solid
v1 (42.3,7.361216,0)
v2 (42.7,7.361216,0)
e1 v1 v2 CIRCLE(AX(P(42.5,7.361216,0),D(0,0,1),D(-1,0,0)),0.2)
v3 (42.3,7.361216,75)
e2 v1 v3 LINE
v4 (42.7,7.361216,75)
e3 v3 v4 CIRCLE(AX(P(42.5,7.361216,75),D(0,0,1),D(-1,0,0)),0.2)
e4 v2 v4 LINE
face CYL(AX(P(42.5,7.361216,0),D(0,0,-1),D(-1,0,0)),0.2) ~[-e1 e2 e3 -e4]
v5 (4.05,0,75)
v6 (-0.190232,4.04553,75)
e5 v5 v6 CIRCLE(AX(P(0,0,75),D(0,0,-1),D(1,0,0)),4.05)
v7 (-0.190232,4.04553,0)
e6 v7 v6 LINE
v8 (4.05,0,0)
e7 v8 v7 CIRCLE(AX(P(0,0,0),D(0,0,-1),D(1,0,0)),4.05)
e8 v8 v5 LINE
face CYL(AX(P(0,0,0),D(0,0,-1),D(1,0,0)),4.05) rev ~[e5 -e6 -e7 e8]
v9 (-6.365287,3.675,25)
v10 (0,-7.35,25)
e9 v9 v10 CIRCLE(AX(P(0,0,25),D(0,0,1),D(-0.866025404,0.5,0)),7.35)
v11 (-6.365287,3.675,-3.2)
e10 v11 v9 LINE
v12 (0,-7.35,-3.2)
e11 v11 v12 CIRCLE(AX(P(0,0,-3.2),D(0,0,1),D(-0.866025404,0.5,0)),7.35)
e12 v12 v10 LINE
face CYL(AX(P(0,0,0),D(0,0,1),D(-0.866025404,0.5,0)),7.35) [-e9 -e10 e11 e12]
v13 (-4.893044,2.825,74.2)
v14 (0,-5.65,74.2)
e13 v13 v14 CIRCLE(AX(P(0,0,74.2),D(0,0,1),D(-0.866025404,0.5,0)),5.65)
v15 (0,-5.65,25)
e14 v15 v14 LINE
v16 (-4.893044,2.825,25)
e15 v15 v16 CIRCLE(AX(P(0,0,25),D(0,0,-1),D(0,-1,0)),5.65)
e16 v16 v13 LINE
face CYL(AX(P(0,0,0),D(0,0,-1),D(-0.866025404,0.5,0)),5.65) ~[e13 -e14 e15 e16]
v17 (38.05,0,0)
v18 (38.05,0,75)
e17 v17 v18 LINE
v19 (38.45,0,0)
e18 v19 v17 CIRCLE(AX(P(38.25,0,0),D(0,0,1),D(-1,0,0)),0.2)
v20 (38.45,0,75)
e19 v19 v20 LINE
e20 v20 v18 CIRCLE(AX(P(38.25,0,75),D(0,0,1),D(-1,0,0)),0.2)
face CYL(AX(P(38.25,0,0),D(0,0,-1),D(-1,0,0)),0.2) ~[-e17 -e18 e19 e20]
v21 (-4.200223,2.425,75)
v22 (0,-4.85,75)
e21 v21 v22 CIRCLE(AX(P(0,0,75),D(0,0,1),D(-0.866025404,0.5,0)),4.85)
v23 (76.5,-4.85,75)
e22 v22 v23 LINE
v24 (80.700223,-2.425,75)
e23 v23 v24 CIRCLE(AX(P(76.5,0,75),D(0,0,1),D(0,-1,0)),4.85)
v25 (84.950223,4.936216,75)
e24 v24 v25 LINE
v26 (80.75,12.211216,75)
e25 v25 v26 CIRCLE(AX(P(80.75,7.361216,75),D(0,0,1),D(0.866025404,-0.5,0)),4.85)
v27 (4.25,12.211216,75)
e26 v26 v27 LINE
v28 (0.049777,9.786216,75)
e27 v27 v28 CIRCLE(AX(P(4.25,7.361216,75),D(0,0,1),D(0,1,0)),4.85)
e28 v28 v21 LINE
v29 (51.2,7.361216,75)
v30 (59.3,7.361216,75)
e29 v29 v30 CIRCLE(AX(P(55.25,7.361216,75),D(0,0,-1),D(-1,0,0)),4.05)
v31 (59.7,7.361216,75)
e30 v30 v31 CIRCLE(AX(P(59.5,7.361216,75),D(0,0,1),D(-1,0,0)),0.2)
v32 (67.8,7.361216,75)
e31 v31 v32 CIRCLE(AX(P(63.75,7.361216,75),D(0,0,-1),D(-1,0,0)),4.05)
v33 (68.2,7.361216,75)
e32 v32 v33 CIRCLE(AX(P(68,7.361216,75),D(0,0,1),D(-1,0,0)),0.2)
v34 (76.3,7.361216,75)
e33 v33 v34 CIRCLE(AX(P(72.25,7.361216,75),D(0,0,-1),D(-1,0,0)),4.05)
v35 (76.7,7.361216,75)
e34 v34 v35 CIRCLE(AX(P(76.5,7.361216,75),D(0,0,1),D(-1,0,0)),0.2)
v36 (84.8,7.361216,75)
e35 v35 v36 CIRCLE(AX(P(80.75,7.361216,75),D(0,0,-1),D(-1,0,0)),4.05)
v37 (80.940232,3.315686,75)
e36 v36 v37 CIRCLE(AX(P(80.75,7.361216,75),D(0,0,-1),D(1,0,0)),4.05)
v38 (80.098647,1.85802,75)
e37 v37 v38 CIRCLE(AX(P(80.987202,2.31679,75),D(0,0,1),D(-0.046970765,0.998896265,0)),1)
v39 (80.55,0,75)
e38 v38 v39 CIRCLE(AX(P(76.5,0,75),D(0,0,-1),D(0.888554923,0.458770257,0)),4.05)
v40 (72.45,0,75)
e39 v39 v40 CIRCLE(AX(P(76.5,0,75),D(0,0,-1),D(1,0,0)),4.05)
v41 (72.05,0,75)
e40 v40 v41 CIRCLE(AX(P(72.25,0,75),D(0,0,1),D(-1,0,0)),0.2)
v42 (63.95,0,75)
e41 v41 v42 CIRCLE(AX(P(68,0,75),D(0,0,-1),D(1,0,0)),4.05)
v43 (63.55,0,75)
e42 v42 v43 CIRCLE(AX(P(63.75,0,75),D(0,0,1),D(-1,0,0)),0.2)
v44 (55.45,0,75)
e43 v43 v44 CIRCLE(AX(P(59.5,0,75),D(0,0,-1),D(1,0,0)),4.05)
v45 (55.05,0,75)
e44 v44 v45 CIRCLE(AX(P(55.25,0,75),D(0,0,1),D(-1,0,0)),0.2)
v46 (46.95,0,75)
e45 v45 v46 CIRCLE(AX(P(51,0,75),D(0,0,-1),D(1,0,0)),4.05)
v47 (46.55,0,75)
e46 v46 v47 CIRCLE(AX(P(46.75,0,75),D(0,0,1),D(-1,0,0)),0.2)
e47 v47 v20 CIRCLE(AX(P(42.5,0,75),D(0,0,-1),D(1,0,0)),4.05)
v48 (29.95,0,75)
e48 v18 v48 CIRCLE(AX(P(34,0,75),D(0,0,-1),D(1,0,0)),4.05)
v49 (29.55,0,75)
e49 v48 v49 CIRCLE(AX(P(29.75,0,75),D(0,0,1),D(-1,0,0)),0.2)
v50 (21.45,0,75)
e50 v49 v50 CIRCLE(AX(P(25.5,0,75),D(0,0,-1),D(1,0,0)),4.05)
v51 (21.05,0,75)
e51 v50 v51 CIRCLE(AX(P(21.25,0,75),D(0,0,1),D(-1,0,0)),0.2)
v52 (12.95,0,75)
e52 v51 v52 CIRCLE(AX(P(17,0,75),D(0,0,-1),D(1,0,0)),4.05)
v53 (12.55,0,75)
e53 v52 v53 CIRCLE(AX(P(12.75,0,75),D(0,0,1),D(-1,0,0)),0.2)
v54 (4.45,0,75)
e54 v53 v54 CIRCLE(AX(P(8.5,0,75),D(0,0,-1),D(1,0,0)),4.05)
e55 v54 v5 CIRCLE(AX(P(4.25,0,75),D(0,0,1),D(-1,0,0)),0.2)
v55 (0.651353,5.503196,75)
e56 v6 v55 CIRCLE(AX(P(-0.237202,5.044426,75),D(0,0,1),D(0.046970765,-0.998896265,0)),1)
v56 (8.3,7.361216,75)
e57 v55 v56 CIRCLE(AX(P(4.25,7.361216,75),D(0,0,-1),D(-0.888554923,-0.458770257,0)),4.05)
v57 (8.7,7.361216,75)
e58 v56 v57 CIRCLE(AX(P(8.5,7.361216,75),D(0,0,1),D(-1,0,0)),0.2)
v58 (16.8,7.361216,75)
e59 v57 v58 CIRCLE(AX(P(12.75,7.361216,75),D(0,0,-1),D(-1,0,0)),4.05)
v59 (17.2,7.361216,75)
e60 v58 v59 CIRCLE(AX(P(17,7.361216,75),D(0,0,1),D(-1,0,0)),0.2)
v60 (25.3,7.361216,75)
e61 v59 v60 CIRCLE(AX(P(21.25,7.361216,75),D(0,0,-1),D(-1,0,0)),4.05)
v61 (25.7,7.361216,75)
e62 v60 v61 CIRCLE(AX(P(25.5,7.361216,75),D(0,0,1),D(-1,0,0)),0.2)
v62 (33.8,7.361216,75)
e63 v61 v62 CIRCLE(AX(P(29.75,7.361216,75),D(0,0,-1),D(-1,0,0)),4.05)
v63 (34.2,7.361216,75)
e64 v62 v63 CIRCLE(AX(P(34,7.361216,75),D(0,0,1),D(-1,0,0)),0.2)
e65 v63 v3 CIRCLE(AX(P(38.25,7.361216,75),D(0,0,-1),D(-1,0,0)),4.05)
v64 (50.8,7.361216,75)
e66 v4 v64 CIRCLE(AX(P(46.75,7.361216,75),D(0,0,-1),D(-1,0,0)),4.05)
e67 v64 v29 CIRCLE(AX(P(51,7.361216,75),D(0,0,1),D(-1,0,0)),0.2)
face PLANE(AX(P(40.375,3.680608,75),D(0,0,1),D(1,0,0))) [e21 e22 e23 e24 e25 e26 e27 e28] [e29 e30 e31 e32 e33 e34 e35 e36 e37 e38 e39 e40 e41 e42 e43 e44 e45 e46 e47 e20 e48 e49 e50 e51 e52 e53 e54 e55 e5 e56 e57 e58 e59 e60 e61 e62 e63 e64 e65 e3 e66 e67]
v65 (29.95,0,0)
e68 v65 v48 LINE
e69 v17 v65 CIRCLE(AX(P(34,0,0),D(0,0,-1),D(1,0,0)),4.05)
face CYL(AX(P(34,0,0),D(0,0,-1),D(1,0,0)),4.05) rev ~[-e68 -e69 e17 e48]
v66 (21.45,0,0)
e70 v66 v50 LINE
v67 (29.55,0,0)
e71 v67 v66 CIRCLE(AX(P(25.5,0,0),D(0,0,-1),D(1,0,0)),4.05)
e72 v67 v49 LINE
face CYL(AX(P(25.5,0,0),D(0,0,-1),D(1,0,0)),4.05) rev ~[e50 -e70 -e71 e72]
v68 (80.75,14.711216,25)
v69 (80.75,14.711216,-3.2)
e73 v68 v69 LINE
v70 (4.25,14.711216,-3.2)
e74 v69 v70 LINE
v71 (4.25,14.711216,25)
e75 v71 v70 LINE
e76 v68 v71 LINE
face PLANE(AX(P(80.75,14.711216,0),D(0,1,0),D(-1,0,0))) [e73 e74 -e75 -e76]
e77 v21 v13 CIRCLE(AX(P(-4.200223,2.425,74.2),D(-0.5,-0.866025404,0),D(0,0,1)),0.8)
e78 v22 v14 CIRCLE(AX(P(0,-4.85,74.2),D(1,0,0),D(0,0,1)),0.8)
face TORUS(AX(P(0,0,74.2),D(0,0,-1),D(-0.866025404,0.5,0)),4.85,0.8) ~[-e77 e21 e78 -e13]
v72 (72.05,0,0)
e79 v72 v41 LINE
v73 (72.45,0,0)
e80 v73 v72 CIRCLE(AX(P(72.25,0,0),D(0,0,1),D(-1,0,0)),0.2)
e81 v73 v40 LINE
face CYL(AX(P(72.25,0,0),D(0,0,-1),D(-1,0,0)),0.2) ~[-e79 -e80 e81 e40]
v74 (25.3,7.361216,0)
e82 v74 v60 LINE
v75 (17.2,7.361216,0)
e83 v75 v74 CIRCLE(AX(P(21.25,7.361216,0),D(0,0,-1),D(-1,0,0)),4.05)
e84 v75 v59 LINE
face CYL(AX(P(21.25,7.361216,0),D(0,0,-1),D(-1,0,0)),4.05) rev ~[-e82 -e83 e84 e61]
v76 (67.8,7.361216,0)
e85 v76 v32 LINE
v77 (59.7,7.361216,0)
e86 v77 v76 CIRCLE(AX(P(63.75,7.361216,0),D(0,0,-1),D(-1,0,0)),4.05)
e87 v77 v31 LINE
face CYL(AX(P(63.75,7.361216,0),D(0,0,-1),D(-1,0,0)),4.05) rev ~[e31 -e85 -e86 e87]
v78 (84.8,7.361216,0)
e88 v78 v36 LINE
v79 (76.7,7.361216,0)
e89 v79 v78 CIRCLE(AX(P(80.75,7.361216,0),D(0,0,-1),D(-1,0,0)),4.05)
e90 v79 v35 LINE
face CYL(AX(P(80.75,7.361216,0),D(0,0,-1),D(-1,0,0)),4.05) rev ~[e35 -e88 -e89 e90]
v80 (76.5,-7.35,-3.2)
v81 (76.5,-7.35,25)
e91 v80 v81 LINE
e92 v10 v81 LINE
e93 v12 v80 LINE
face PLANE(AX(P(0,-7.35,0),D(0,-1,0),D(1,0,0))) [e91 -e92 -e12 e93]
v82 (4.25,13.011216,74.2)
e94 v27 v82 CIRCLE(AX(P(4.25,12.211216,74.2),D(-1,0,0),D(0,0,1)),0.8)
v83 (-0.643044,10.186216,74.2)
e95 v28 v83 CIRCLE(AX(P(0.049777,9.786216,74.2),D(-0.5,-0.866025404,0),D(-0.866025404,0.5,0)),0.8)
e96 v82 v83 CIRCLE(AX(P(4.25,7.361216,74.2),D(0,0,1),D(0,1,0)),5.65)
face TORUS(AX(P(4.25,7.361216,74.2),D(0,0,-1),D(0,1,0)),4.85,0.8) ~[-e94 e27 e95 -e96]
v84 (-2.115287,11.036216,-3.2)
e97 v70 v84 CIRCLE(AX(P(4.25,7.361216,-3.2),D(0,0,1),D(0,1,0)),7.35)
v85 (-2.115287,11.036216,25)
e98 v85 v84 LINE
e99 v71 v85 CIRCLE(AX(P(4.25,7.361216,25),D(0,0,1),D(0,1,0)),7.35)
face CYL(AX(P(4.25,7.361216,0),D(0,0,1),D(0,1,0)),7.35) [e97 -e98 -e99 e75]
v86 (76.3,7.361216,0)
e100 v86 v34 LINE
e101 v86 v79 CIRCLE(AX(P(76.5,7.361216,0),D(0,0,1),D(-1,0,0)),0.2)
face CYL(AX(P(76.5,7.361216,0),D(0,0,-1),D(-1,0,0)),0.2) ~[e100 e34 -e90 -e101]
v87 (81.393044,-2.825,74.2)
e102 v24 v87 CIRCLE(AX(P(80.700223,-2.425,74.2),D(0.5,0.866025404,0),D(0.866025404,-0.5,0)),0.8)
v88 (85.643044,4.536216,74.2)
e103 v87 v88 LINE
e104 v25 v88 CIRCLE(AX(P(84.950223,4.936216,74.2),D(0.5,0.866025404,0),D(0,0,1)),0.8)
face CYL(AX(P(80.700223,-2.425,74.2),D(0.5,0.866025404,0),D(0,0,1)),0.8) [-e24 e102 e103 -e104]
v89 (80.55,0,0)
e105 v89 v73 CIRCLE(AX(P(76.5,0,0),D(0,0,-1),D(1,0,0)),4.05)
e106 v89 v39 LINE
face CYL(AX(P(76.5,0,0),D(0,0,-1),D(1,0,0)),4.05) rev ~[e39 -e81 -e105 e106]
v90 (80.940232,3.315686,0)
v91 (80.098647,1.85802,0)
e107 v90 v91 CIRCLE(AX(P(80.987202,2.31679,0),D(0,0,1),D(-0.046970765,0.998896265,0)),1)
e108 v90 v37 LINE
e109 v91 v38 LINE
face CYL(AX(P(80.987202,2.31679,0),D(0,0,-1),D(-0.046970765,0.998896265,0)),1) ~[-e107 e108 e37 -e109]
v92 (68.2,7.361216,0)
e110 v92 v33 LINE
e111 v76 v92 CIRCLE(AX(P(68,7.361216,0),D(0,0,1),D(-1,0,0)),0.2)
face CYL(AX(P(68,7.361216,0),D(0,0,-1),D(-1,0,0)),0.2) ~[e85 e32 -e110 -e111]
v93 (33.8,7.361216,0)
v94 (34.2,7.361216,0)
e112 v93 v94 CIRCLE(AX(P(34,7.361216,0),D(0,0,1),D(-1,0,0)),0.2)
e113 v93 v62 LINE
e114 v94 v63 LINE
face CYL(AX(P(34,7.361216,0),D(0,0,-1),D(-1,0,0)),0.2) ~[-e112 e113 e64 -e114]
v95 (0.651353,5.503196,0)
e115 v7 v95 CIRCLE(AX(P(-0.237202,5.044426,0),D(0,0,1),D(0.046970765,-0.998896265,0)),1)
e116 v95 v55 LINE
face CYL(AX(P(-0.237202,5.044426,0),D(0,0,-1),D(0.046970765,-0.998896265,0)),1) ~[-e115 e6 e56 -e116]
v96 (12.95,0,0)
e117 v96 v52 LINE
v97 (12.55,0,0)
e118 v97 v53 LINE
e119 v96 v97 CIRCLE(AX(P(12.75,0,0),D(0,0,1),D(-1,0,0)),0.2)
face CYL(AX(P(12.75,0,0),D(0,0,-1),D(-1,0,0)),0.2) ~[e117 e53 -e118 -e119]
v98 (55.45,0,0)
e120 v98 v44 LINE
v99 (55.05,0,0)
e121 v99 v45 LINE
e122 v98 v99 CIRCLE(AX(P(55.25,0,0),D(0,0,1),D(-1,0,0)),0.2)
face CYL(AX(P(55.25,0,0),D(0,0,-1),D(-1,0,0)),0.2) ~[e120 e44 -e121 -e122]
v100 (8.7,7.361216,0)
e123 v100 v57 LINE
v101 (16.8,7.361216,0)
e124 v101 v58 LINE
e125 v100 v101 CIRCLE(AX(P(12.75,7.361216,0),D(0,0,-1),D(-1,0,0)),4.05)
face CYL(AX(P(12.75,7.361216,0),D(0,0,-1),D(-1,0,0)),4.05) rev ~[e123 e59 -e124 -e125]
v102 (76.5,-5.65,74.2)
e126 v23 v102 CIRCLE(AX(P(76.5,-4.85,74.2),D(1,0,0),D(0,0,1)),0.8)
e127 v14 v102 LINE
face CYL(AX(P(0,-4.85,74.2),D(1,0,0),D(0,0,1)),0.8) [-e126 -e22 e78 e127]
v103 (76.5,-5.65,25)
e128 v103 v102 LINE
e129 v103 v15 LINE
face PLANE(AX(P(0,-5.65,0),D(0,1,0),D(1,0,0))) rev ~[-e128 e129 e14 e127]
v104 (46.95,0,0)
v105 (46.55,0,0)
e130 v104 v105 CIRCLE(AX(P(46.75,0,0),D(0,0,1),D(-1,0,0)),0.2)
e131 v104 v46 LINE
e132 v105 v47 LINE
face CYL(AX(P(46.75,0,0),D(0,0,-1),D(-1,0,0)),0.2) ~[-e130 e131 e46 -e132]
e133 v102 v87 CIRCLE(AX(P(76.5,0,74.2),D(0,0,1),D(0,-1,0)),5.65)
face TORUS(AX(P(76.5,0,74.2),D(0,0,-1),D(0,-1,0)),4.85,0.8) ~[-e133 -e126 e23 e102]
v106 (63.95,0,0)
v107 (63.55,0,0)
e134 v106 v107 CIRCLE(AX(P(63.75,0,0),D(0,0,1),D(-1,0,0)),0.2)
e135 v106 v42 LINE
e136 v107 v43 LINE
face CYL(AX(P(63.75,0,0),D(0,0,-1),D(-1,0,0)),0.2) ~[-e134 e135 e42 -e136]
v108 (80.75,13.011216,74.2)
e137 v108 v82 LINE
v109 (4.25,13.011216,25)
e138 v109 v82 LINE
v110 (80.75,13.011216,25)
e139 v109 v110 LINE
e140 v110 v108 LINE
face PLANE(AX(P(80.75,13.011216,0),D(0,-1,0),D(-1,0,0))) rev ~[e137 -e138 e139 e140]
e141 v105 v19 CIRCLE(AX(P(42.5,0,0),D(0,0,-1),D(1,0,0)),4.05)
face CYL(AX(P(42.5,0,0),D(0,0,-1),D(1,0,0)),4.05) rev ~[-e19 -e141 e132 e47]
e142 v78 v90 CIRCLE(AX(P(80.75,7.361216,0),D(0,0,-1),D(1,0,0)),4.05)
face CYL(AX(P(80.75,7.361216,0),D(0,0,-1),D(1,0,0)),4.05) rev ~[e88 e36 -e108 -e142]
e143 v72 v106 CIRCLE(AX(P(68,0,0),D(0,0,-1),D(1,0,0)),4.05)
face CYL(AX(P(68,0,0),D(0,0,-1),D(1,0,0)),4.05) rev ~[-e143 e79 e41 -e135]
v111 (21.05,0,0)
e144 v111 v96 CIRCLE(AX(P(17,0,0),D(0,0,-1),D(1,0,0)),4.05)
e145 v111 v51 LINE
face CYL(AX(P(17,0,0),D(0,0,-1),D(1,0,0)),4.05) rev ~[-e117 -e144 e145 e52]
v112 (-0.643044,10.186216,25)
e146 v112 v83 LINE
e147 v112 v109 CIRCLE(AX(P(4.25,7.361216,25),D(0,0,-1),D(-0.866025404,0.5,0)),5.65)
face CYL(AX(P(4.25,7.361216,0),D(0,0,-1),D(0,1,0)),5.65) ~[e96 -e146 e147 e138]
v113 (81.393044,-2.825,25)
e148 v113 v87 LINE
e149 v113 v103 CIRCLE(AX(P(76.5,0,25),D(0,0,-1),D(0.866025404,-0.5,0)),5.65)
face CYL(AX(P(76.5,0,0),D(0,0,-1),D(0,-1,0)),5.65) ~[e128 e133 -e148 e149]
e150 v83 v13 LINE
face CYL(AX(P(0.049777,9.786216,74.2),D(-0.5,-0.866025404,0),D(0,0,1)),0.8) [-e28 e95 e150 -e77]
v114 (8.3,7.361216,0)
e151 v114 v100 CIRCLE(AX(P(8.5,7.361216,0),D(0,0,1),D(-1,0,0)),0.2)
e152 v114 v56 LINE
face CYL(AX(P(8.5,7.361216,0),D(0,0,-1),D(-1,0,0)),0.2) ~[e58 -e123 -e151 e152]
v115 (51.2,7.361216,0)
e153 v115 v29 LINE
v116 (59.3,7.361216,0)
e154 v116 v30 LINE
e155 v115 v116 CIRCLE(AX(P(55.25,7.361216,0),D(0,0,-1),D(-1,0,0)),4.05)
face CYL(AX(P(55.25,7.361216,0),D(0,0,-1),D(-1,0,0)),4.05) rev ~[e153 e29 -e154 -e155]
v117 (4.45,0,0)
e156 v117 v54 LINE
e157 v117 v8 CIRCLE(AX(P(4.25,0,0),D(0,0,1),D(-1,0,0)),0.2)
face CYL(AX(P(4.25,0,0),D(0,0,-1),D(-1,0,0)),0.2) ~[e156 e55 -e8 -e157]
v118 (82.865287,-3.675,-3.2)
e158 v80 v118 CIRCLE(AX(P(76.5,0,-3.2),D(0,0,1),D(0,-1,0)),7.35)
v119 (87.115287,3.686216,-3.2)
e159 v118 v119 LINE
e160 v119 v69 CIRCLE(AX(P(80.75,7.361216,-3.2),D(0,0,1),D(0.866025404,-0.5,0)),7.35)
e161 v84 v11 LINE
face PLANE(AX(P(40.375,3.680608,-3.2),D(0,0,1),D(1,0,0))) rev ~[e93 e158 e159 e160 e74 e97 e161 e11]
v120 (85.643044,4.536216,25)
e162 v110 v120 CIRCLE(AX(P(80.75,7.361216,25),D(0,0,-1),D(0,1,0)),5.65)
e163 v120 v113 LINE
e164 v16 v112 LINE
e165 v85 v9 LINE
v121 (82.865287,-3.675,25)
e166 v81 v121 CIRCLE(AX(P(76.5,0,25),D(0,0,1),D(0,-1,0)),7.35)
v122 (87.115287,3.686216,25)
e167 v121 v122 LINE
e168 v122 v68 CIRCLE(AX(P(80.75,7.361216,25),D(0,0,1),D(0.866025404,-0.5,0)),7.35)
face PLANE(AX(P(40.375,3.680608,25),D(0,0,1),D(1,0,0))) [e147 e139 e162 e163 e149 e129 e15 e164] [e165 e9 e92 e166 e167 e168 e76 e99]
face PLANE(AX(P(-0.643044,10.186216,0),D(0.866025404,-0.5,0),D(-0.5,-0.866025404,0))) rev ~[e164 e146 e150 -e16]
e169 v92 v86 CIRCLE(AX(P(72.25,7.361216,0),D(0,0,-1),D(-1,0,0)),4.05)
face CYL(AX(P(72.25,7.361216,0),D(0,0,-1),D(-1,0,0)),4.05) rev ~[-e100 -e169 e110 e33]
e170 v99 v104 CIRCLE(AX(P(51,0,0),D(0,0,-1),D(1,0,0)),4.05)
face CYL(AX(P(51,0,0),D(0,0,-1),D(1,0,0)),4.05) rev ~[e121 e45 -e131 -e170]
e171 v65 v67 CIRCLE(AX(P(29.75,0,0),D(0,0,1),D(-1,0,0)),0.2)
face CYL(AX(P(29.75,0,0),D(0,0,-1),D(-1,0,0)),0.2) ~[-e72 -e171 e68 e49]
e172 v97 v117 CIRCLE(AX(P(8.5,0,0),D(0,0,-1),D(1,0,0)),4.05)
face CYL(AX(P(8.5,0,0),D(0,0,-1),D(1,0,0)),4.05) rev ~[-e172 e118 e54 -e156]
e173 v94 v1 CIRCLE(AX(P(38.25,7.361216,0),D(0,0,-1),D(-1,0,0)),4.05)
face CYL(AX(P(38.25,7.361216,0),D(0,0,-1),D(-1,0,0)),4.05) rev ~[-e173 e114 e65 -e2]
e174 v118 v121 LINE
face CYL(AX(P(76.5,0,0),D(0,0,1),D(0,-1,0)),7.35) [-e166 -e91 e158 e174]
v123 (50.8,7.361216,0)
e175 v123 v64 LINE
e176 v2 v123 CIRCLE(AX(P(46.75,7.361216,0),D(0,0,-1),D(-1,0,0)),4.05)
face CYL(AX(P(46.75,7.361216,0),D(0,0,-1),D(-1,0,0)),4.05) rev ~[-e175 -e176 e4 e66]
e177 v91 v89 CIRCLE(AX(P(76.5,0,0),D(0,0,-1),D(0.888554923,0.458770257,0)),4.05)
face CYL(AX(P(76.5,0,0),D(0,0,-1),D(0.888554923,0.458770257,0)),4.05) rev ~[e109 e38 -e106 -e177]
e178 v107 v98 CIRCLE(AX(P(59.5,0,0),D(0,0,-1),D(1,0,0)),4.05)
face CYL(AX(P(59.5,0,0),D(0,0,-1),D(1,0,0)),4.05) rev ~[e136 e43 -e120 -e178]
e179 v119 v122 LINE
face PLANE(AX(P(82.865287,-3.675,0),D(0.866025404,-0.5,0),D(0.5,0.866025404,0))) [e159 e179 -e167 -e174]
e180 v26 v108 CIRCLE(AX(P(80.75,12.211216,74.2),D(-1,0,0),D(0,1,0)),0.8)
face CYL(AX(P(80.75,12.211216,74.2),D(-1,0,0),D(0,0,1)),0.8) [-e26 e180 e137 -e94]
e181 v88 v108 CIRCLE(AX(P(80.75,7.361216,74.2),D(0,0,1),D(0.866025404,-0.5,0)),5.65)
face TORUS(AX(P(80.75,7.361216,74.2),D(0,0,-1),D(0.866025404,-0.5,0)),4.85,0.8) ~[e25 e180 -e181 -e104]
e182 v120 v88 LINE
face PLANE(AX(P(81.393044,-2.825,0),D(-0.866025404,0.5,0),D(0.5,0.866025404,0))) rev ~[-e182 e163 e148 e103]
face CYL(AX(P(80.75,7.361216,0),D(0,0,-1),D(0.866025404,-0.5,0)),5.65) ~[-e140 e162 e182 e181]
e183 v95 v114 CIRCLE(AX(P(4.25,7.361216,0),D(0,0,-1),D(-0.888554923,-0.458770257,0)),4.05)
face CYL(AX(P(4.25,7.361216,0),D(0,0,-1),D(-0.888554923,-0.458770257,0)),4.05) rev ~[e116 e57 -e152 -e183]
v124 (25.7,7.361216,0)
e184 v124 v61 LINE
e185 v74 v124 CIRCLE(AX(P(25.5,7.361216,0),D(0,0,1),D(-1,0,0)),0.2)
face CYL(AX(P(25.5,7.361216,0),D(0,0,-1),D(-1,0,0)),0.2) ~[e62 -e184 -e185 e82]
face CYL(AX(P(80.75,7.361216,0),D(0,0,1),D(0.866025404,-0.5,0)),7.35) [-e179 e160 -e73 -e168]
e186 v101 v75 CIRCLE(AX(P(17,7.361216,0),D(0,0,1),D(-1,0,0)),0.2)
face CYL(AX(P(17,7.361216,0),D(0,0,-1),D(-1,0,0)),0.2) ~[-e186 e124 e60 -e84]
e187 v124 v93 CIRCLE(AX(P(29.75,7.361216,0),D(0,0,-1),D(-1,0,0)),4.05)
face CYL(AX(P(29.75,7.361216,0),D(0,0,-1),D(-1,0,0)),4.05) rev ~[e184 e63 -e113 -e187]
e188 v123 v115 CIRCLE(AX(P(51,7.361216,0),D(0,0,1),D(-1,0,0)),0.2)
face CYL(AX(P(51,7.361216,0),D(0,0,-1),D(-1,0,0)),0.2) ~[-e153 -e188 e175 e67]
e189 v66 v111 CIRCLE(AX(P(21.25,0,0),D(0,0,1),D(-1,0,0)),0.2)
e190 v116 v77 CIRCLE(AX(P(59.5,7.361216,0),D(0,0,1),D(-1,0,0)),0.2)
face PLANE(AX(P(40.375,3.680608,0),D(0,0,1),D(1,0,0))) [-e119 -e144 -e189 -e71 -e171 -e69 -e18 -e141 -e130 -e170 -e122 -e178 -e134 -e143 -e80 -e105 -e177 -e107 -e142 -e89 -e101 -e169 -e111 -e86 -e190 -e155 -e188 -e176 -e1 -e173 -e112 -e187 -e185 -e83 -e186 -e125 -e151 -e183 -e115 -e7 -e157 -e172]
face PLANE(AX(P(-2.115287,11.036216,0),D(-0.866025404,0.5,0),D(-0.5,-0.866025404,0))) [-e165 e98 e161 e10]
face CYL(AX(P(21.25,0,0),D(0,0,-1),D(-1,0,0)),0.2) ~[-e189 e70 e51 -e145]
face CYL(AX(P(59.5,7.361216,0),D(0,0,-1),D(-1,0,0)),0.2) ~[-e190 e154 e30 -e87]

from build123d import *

# Parameters (mm, degrees)
F1_DEPTH = 75
F2_DEPTH = 25
F3_DEPTH = 3.2
F4_R     = 0.8


# Not quite as in the source:
# - a feature names something its author has since deleted; it is built from what else it names


with BuildPart() as f1:
    # F0 (on Top) → F1 (new body)
    with BuildSketch(Plane.XY):
        with BuildLine():
            Line((-0.6430435314, 10.1862159322), (-4.8930435314, 2.825))
            ThreePointArc((-4.8930435314, 2.825), (-4.8930435314, -2.825), (0, -5.65))
            Line((0, -5.65), (76.5, -5.65))
            ThreePointArc((76.5, -5.65), (79.325, -4.8930435314), (81.3930435314, -2.825))
            Line((81.3930435314, -2.825), (85.6430435314, 4.5362159322))
            ThreePointArc((85.6430435314, 4.5362159322), (85.6430435314, 10.1862159322), (80.75, 13.0112159322))
            Line((80.75, 13.0112159322), (4.25, 13.0112159322))
            ThreePointArc((4.25, 13.0112159322), (1.425, 12.2542594635), (-0.6430435314, 10.1862159322))
        make_face()
        with BuildLine():
            ThreePointArc((4.45, 0), (4.25, -0.2), (4.05, 0))
            ThreePointArc((4.05, 0), (-2.7957165477, -2.9302677326), (-0.1902315974, 4.0455298713))
            ThreePointArc((-0.1902315974, 4.0455298713), (0.6288230416, 4.5444261358), (0.651352561, 5.5031963925))
            ThreePointArc((0.651352561, 5.5031963925), (3.2939723142, 11.2967605024), (8.3, 7.3612159322))
            ThreePointArc((8.3, 7.3612159322), (8.5, 7.5612159322), (8.7, 7.3612159322))
            ThreePointArc((8.7, 7.3612159322), (12.75, 11.4112159322), (16.8, 7.3612159322))
            ThreePointArc((16.8, 7.3612159322), (17, 7.5612159322), (17.2, 7.3612159322))
            ThreePointArc((17.2, 7.3612159322), (21.25, 11.4112159322), (25.3, 7.3612159322))
            ThreePointArc((25.3, 7.3612159322), (25.5, 7.5612159322), (25.7, 7.3612159322))
            ThreePointArc((25.7, 7.3612159322), (29.75, 11.4112159322), (33.8, 7.3612159322))
            ThreePointArc((33.8, 7.3612159322), (34, 7.5612159322), (34.2, 7.3612159322))
            ThreePointArc((34.2, 7.3612159322), (38.25, 11.4112159322), (42.3, 7.3612159322))
            ThreePointArc((42.3, 7.3612159322), (42.5, 7.5612159322), (42.7, 7.3612159322))
            ThreePointArc((42.7, 7.3612159322), (46.75, 11.4112159322), (50.8, 7.3612159322))
            ThreePointArc((50.8, 7.3612159322), (51, 7.5612159322), (51.2, 7.3612159322))
            ThreePointArc((51.2, 7.3612159322), (55.25, 11.4112159322), (59.3, 7.3612159322))
            ThreePointArc((59.3, 7.3612159322), (59.5, 7.5612159322), (59.7, 7.3612159322))
            ThreePointArc((59.7, 7.3612159322), (63.75, 11.4112159322), (67.8, 7.3612159322))
            ThreePointArc((67.8, 7.3612159322), (68, 7.5612159322), (68.2, 7.3612159322))
            ThreePointArc((68.2, 7.3612159322), (72.25, 11.4112159322), (76.3, 7.3612159322))
            ThreePointArc((76.3, 7.3612159322), (76.5, 7.5612159322), (76.7, 7.3612159322))
            ThreePointArc((76.7, 7.3612159322), (80.75, 11.4112159322), (84.8, 7.3612159322))
            ThreePointArc((84.8, 7.3612159322), (83.6802677326, 4.5654993844), (80.9402315974, 3.3156860609))
            ThreePointArc((80.9402315974, 3.3156860609), (80.1211769584, 2.8167897964), (80.098647439, 1.8580195397))
            ThreePointArc((80.098647439, 1.8580195397), (80.4355445702, 0.9560276858), (80.55, 0))
            ThreePointArc((80.55, 0), (76.5, -4.05), (72.45, 0))
            ThreePointArc((72.45, 0), (72.25, -0.2), (72.05, 0))
            ThreePointArc((72.05, 0), (68, -4.05), (63.95, 0))
            ThreePointArc((63.95, 0), (63.75, -0.2), (63.55, 0))
            ThreePointArc((63.55, 0), (59.5, -4.05), (55.45, 0))
            ThreePointArc((55.45, 0), (55.25, -0.2), (55.05, 0))
            ThreePointArc((55.05, 0), (51, -4.05), (46.95, 0))
            ThreePointArc((46.95, 0), (46.75, -0.2), (46.55, 0))
            ThreePointArc((46.55, 0), (42.5, -4.05), (38.45, 0))
            ThreePointArc((38.45, 0), (38.25, -0.2), (38.05, 0))
            ThreePointArc((38.05, 0), (34, -4.05), (29.95, 0))
            ThreePointArc((29.95, 0), (29.75, -0.2), (29.55, 0))
            ThreePointArc((29.55, 0), (25.5, -4.05), (21.45, 0))
            ThreePointArc((21.45, 0), (21.25, -0.2), (21.05, 0))
            ThreePointArc((21.05, 0), (17, -4.05), (12.95, 0))
            ThreePointArc((12.95, 0), (12.75, -0.2), (12.55, 0))
            ThreePointArc((12.55, 0), (8.5, -4.05), (4.45, 0))
        make_face(mode=Mode.SUBTRACT)
        with BuildLine():
            ThreePointArc((4.45, 0), (4.25, 0.2), (4.05, 0))
            ThreePointArc((4.05, 0), (4.25, -0.2), (4.45, 0))
        make_face()
        with BuildLine():
            ThreePointArc((8.7, 7.3612159322), (8.5, 7.5612159322), (8.3, 7.3612159322))
            ThreePointArc((8.3, 7.3612159322), (8.5, 7.1612159322), (8.7, 7.3612159322))
        make_face()
        with BuildLine():
            ThreePointArc((12.95, 0), (12.75, 0.2), (12.55, 0))
            ThreePointArc((12.55, 0), (12.75, -0.2), (12.95, 0))
        make_face()
        with BuildLine():
            ThreePointArc((17.2, 7.3612159322), (17, 7.5612159322), (16.8, 7.3612159322))
            ThreePointArc((16.8, 7.3612159322), (17, 7.1612159322), (17.2, 7.3612159322))
        make_face()
        with BuildLine():
            ThreePointArc((21.45, 0), (21.25, 0.2), (21.05, 0))
            ThreePointArc((21.05, 0), (21.25, -0.2), (21.45, 0))
        make_face()
        with BuildLine():
            ThreePointArc((25.7, 7.3612159322), (25.5, 7.5612159322), (25.3, 7.3612159322))
            ThreePointArc((25.3, 7.3612159322), (25.5, 7.1612159322), (25.7, 7.3612159322))
        make_face()
        with BuildLine():
            ThreePointArc((29.95, 0), (29.75, 0.2), (29.55, 0))
            ThreePointArc((29.55, 0), (29.75, -0.2), (29.95, 0))
        make_face()
        with BuildLine():
            ThreePointArc((34.2, 7.3612159322), (34, 7.5612159322), (33.8, 7.3612159322))
            ThreePointArc((33.8, 7.3612159322), (34, 7.1612159322), (34.2, 7.3612159322))
        make_face()
        with BuildLine():
            ThreePointArc((38.45, 0), (38.25, 0.2), (38.05, 0))
            ThreePointArc((38.05, 0), (38.25, -0.2), (38.45, 0))
        make_face()
        with BuildLine():
            ThreePointArc((42.7, 7.3612159322), (42.5, 7.5612159322), (42.3, 7.3612159322))
            ThreePointArc((42.3, 7.3612159322), (42.5, 7.1612159322), (42.7, 7.3612159322))
        make_face()
        with BuildLine():
            ThreePointArc((46.95, 0), (46.75, 0.2), (46.55, 0))
            ThreePointArc((46.55, 0), (46.75, -0.2), (46.95, 0))
        make_face()
        with BuildLine():
            ThreePointArc((51.2, 7.3612159322), (51, 7.5612159322), (50.8, 7.3612159322))
            ThreePointArc((50.8, 7.3612159322), (51, 7.1612159322), (51.2, 7.3612159322))
        make_face()
        with BuildLine():
            ThreePointArc((55.45, 0), (55.25, 0.2), (55.05, 0))
            ThreePointArc((55.05, 0), (55.25, -0.2), (55.45, 0))
        make_face()
        with BuildLine():
            ThreePointArc((59.7, 7.3612159322), (59.5, 7.5612159322), (59.3, 7.3612159322))
            ThreePointArc((59.3, 7.3612159322), (59.5, 7.1612159322), (59.7, 7.3612159322))
        make_face()
        with BuildLine():
            ThreePointArc((63.95, 0), (63.75, 0.2), (63.55, 0))
            ThreePointArc((63.55, 0), (63.75, -0.2), (63.95, 0))
        make_face()
        with BuildLine():
            ThreePointArc((68.2, 7.3612159322), (68, 7.5612159322), (67.8, 7.3612159322))
            ThreePointArc((67.8, 7.3612159322), (68, 7.1612159322), (68.2, 7.3612159322))
        make_face()
        with BuildLine():
            ThreePointArc((72.45, 0), (72.25, 0.2), (72.05, 0))
            ThreePointArc((72.05, 0), (72.25, -0.2), (72.45, 0))
        make_face()
        with BuildLine():
            ThreePointArc((76.7, 7.3612159322), (76.5, 7.5612159322), (76.3, 7.3612159322))
            ThreePointArc((76.3, 7.3612159322), (76.5, 7.1612159322), (76.7, 7.3612159322))
        make_face()
    extrude(amount=F1_DEPTH)

    # F0 (on Top) → F2 (join)
    with BuildSketch(Plane.XY):
        with BuildLine():
            Line((-2.1152867178, 11.0362159322), (-6.3652867178, 3.675))
            ThreePointArc((-6.3652867178, 3.675), (-6.3652867178, -3.675), (0, -7.35))
            Line((0, -7.35), (76.5, -7.35))
            ThreePointArc((76.5, -7.35), (80.175, -6.3652867178), (82.8652867178, -3.675))
            Line((82.8652867178, -3.675), (87.1152867178, 3.6862159322))
            ThreePointArc((87.1152867178, 3.6862159322), (87.1152867178, 11.0362159322), (80.75, 14.7112159322))
            Line((80.75, 14.7112159322), (4.25, 14.7112159322))
            ThreePointArc((4.25, 14.7112159322), (0.575, 13.72650265), (-2.1152867178, 11.0362159322))
        make_face()
        with BuildLine():
            ThreePointArc((0, -5.65), (-4.8930435314, -2.825), (-4.8930435314, 2.825))
            Line((-4.8930435314, 2.825), (-0.6430435314, 10.1862159322))
            ThreePointArc((-0.6430435314, 10.1862159322), (1.425, 12.2542594635), (4.25, 13.0112159322))
            Line((4.25, 13.0112159322), (80.75, 13.0112159322))
            ThreePointArc((80.75, 13.0112159322), (85.6430435314, 10.1862159322), (85.6430435314, 4.5362159322))
            Line((85.6430435314, 4.5362159322), (81.3930435314, -2.825))
            ThreePointArc((81.3930435314, -2.825), (79.325, -4.8930435314), (76.5, -5.65))
            Line((76.5, -5.65), (0, -5.65))
        make_face(mode=Mode.SUBTRACT)
    extrude(amount=F2_DEPTH)

    # F0 (on Top) → F3 (join)
    with BuildSketch(Plane.XY):
        with BuildLine():
            Line((-2.1152867178, 11.0362159322), (-6.3652867178, 3.675))
            ThreePointArc((-6.3652867178, 3.675), (-6.3652867178, -3.675), (0, -7.35))
            Line((0, -7.35), (76.5, -7.35))
            ThreePointArc((76.5, -7.35), (80.175, -6.3652867178), (82.8652867178, -3.675))
            Line((82.8652867178, -3.675), (87.1152867178, 3.6862159322))
            ThreePointArc((87.1152867178, 3.6862159322), (87.1152867178, 11.0362159322), (80.75, 14.7112159322))
            Line((80.75, 14.7112159322), (4.25, 14.7112159322))
            ThreePointArc((4.25, 14.7112159322), (0.575, 13.72650265), (-2.1152867178, 11.0362159322))
        make_face()
        with BuildLine():
            ThreePointArc((0, -5.65), (-4.8930435314, -2.825), (-4.8930435314, 2.825))
            Line((-4.8930435314, 2.825), (-0.6430435314, 10.1862159322))
            ThreePointArc((-0.6430435314, 10.1862159322), (1.425, 12.2542594635), (4.25, 13.0112159322))
            Line((4.25, 13.0112159322), (80.75, 13.0112159322))
            ThreePointArc((80.75, 13.0112159322), (85.6430435314, 10.1862159322), (85.6430435314, 4.5362159322))
            Line((85.6430435314, 4.5362159322), (81.3930435314, -2.825))
            ThreePointArc((81.3930435314, -2.825), (79.325, -4.8930435314), (76.5, -5.65))
            Line((76.5, -5.65), (0, -5.65))
        make_face(mode=Mode.SUBTRACT)
        with BuildLine():
            Line((-0.6430435314, 10.1862159322), (-4.8930435314, 2.825))
            ThreePointArc((-4.8930435314, 2.825), (-4.8930435314, -2.825), (0, -5.65))
            Line((0, -5.65), (76.5, -5.65))
            ThreePointArc((76.5, -5.65), (79.325, -4.8930435314), (81.3930435314, -2.825))
            Line((81.3930435314, -2.825), (85.6430435314, 4.5362159322))
            ThreePointArc((85.6430435314, 4.5362159322), (85.6430435314, 10.1862159322), (80.75, 13.0112159322))
            Line((80.75, 13.0112159322), (4.25, 13.0112159322))
            ThreePointArc((4.25, 13.0112159322), (1.425, 12.2542594635), (-0.6430435314, 10.1862159322))
        make_face()
        with BuildLine():
            ThreePointArc((4.45, 0), (4.25, -0.2), (4.05, 0))
            ThreePointArc((4.05, 0), (-2.7957165477, -2.9302677326), (-0.1902315974, 4.0455298713))
            ThreePointArc((-0.1902315974, 4.0455298713), (0.6288230416, 4.5444261358), (0.651352561, 5.5031963925))
            ThreePointArc((0.651352561, 5.5031963925), (3.2939723142, 11.2967605024), (8.3, 7.3612159322))
            ThreePointArc((8.3, 7.3612159322), (8.5, 7.5612159322), (8.7, 7.3612159322))
            ThreePointArc((8.7, 7.3612159322), (12.75, 11.4112159322), (16.8, 7.3612159322))
            ThreePointArc((16.8, 7.3612159322), (17, 7.5612159322), (17.2, 7.3612159322))
            ThreePointArc((17.2, 7.3612159322), (21.25, 11.4112159322), (25.3, 7.3612159322))
            ThreePointArc((25.3, 7.3612159322), (25.5, 7.5612159322), (25.7, 7.3612159322))
            ThreePointArc((25.7, 7.3612159322), (29.75, 11.4112159322), (33.8, 7.3612159322))
            ThreePointArc((33.8, 7.3612159322), (34, 7.5612159322), (34.2, 7.3612159322))
            ThreePointArc((34.2, 7.3612159322), (38.25, 11.4112159322), (42.3, 7.3612159322))
            ThreePointArc((42.3, 7.3612159322), (42.5, 7.5612159322), (42.7, 7.3612159322))
            ThreePointArc((42.7, 7.3612159322), (46.75, 11.4112159322), (50.8, 7.3612159322))
            ThreePointArc((50.8, 7.3612159322), (51, 7.5612159322), (51.2, 7.3612159322))
            ThreePointArc((51.2, 7.3612159322), (55.25, 11.4112159322), (59.3, 7.3612159322))
            ThreePointArc((59.3, 7.3612159322), (59.5, 7.5612159322), (59.7, 7.3612159322))
            ThreePointArc((59.7, 7.3612159322), (63.75, 11.4112159322), (67.8, 7.3612159322))
            ThreePointArc((67.8, 7.3612159322), (68, 7.5612159322), (68.2, 7.3612159322))
            ThreePointArc((68.2, 7.3612159322), (72.25, 11.4112159322), (76.3, 7.3612159322))
            ThreePointArc((76.3, 7.3612159322), (76.5, 7.5612159322), (76.7, 7.3612159322))
            ThreePointArc((76.7, 7.3612159322), (80.75, 11.4112159322), (84.8, 7.3612159322))
            ThreePointArc((84.8, 7.3612159322), (83.6802677326, 4.5654993844), (80.9402315974, 3.3156860609))
            ThreePointArc((80.9402315974, 3.3156860609), (80.1211769584, 2.8167897964), (80.098647439, 1.8580195397))
            ThreePointArc((80.098647439, 1.8580195397), (80.4355445702, 0.9560276858), (80.55, 0))
            ThreePointArc((80.55, 0), (76.5, -4.05), (72.45, 0))
            ThreePointArc((72.45, 0), (72.25, -0.2), (72.05, 0))
            ThreePointArc((72.05, 0), (68, -4.05), (63.95, 0))
            ThreePointArc((63.95, 0), (63.75, -0.2), (63.55, 0))
            ThreePointArc((63.55, 0), (59.5, -4.05), (55.45, 0))
            ThreePointArc((55.45, 0), (55.25, -0.2), (55.05, 0))
            ThreePointArc((55.05, 0), (51, -4.05), (46.95, 0))
            ThreePointArc((46.95, 0), (46.75, -0.2), (46.55, 0))
            ThreePointArc((46.55, 0), (42.5, -4.05), (38.45, 0))
            ThreePointArc((38.45, 0), (38.25, -0.2), (38.05, 0))
            ThreePointArc((38.05, 0), (34, -4.05), (29.95, 0))
            ThreePointArc((29.95, 0), (29.75, -0.2), (29.55, 0))
            ThreePointArc((29.55, 0), (25.5, -4.05), (21.45, 0))
            ThreePointArc((21.45, 0), (21.25, -0.2), (21.05, 0))
            ThreePointArc((21.05, 0), (17, -4.05), (12.95, 0))
            ThreePointArc((12.95, 0), (12.75, -0.2), (12.55, 0))
            ThreePointArc((12.55, 0), (8.5, -4.05), (4.45, 0))
        make_face(mode=Mode.SUBTRACT)
        with BuildLine():
            ThreePointArc((-0.1902315974, 4.0455298713), (2.7957165477, 2.9302677326), (4.05, 0))
            ThreePointArc((4.05, 0), (4.25, 0.2), (4.45, 0))
            ThreePointArc((4.45, 0), (8.5, 4.05), (12.55, 0))
            ThreePointArc((12.55, 0), (12.75, 0.2), (12.95, 0))
            ThreePointArc((12.95, 0), (17, 4.05), (21.05, 0))
            ThreePointArc((21.05, 0), (21.25, 0.2), (21.45, 0))
            ThreePointArc((21.45, 0), (25.5, 4.05), (29.55, 0))
            ThreePointArc((29.55, 0), (29.75, 0.2), (29.95, 0))
            ThreePointArc((29.95, 0), (34, 4.05), (38.05, 0))
            ThreePointArc((38.05, 0), (38.25, 0.2), (38.45, 0))
            ThreePointArc((38.45, 0), (42.5, 4.05), (46.55, 0))
            ThreePointArc((46.55, 0), (46.75, 0.2), (46.95, 0))
            ThreePointArc((46.95, 0), (51, 4.05), (55.05, 0))
            ThreePointArc((55.05, 0), (55.25, 0.2), (55.45, 0))
            ThreePointArc((55.45, 0), (59.5, 4.05), (63.55, 0))
            ThreePointArc((63.55, 0), (63.75, 0.2), (63.95, 0))
            ThreePointArc((63.95, 0), (68, 4.05), (72.05, 0))
            ThreePointArc((72.05, 0), (72.25, 0.2), (72.45, 0))
            ThreePointArc((72.45, 0), (75.5439723142, 3.9355445702), (80.098647439, 1.8580195397))
            ThreePointArc((80.098647439, 1.8580195397), (80.1211769584, 2.8167897964), (80.9402315974, 3.3156860609))
            ThreePointArc((80.9402315974, 3.3156860609), (77.9542834523, 4.4309481996), (76.7, 7.3612159322))
            ThreePointArc((76.7, 7.3612159322), (76.5, 7.1612159322), (76.3, 7.3612159322))
            ThreePointArc((76.3, 7.3612159322), (72.25, 3.3112159322), (68.2, 7.3612159322))
            ThreePointArc((68.2, 7.3612159322), (68, 7.1612159322), (67.8, 7.3612159322))
            ThreePointArc((67.8, 7.3612159322), (63.75, 3.3112159322), (59.7, 7.3612159322))
            ThreePointArc((59.7, 7.3612159322), (59.5, 7.1612159322), (59.3, 7.3612159322))
            ThreePointArc((59.3, 7.3612159322), (55.25, 3.3112159322), (51.2, 7.3612159322))
            ThreePointArc((51.2, 7.3612159322), (51, 7.1612159322), (50.8, 7.3612159322))
            ThreePointArc((50.8, 7.3612159322), (46.75, 3.3112159322), (42.7, 7.3612159322))
            ThreePointArc((42.7, 7.3612159322), (42.5, 7.1612159322), (42.3, 7.3612159322))
            ThreePointArc((42.3, 7.3612159322), (38.25, 3.3112159322), (34.2, 7.3612159322))
            ThreePointArc((34.2, 7.3612159322), (34, 7.1612159322), (33.8, 7.3612159322))
            ThreePointArc((33.8, 7.3612159322), (29.75, 3.3112159322), (25.7, 7.3612159322))
            ThreePointArc((25.7, 7.3612159322), (25.5, 7.1612159322), (25.3, 7.3612159322))
            ThreePointArc((25.3, 7.3612159322), (21.25, 3.3112159322), (17.2, 7.3612159322))
            ThreePointArc((17.2, 7.3612159322), (17, 7.1612159322), (16.8, 7.3612159322))
            ThreePointArc((16.8, 7.3612159322), (12.75, 3.3112159322), (8.7, 7.3612159322))
            ThreePointArc((8.7, 7.3612159322), (8.5, 7.1612159322), (8.3, 7.3612159322))
            ThreePointArc((8.3, 7.3612159322), (5.2060276858, 3.425671362), (0.651352561, 5.5031963925))
            ThreePointArc((0.651352561, 5.5031963925), (0.6288230416, 4.5444261358), (-0.1902315974, 4.0455298713))
        make_face()
        with BuildLine():
            ThreePointArc((-0.1902315974, 4.0455298713), (-2.7957165477, -2.9302677326), (4.05, 0))
            ThreePointArc((4.05, 0), (2.7957165477, 2.9302677326), (-0.1902315974, 4.0455298713))
        make_face()
        with BuildLine():
            ThreePointArc((12.55, 0), (8.5, 4.05), (4.45, 0))
            ThreePointArc((4.45, 0), (8.5, -4.05), (12.55, 0))
        make_face()
        with BuildLine():
            ThreePointArc((8.3, 7.3612159322), (3.2939723142, 11.2967605024), (0.651352561, 5.5031963925))
            ThreePointArc((0.651352561, 5.5031963925), (5.2060276858, 3.425671362), (8.3, 7.3612159322))
        make_face()
        with BuildLine():
            ThreePointArc((21.05, 0), (17, 4.05), (12.95, 0))
            ThreePointArc((12.95, 0), (17, -4.05), (21.05, 0))
        make_face()
        with BuildLine():
            ThreePointArc((16.8, 7.3612159322), (12.75, 11.4112159322), (8.7, 7.3612159322))
            ThreePointArc((8.7, 7.3612159322), (12.75, 3.3112159322), (16.8, 7.3612159322))
        make_face()
        with BuildLine():
            ThreePointArc((29.55, 0), (25.5, 4.05), (21.45, 0))
            ThreePointArc((21.45, 0), (25.5, -4.05), (29.55, 0))
        make_face()
        with BuildLine():
            ThreePointArc((25.3, 7.3612159322), (21.25, 11.4112159322), (17.2, 7.3612159322))
            ThreePointArc((17.2, 7.3612159322), (21.25, 3.3112159322), (25.3, 7.3612159322))
        make_face()
        with BuildLine():
            ThreePointArc((38.05, 0), (34, 4.05), (29.95, 0))
            ThreePointArc((29.95, 0), (34, -4.05), (38.05, 0))
        make_face()
        with BuildLine():
            ThreePointArc((33.8, 7.3612159322), (29.75, 11.4112159322), (25.7, 7.3612159322))
            ThreePointArc((25.7, 7.3612159322), (29.75, 3.3112159322), (33.8, 7.3612159322))
        make_face()
        with BuildLine():
            ThreePointArc((46.55, 0), (42.5, 4.05), (38.45, 0))
            ThreePointArc((38.45, 0), (42.5, -4.05), (46.55, 0))
        make_face()
        with BuildLine():
            ThreePointArc((42.3, 7.3612159322), (38.25, 11.4112159322), (34.2, 7.3612159322))
            ThreePointArc((34.2, 7.3612159322), (38.25, 3.3112159322), (42.3, 7.3612159322))
        make_face()
        with BuildLine():
            ThreePointArc((55.05, 0), (51, 4.05), (46.95, 0))
            ThreePointArc((46.95, 0), (51, -4.05), (55.05, 0))
        make_face()
        with BuildLine():
            ThreePointArc((50.8, 7.3612159322), (46.75, 11.4112159322), (42.7, 7.3612159322))
            ThreePointArc((42.7, 7.3612159322), (46.75, 3.3112159322), (50.8, 7.3612159322))
        make_face()
        with BuildLine():
            ThreePointArc((63.55, 0), (59.5, 4.05), (55.45, 0))
            ThreePointArc((55.45, 0), (59.5, -4.05), (63.55, 0))
        make_face()
        with BuildLine():
            ThreePointArc((59.3, 7.3612159322), (55.25, 11.4112159322), (51.2, 7.3612159322))
            ThreePointArc((51.2, 7.3612159322), (55.25, 3.3112159322), (59.3, 7.3612159322))
        make_face()
        with BuildLine():
            ThreePointArc((72.05, 0), (68, 4.05), (63.95, 0))
            ThreePointArc((63.95, 0), (68, -4.05), (72.05, 0))
        make_face()
        with BuildLine():
            ThreePointArc((67.8, 7.3612159322), (63.75, 11.4112159322), (59.7, 7.3612159322))
            ThreePointArc((59.7, 7.3612159322), (63.75, 3.3112159322), (67.8, 7.3612159322))
        make_face()
        with BuildLine():
            ThreePointArc((80.098647439, 1.8580195397), (75.5439723142, 3.9355445702), (72.45, 0))
            ThreePointArc((72.45, 0), (76.5, -4.05), (80.55, 0))
            ThreePointArc((80.55, 0), (80.4355445702, 0.9560276858), (80.098647439, 1.8580195397))
        make_face()
        with BuildLine():
            ThreePointArc((76.3, 7.3612159322), (72.25, 11.4112159322), (68.2, 7.3612159322))
            ThreePointArc((68.2, 7.3612159322), (72.25, 3.3112159322), (76.3, 7.3612159322))
        make_face()
        with BuildLine():
            ThreePointArc((76.7, 7.3612159322), (77.9542834523, 4.4309481996), (80.9402315974, 3.3156860609))
            ThreePointArc((80.9402315974, 3.3156860609), (83.6802677326, 4.5654993844), (84.8, 7.3612159322))
            ThreePointArc((84.8, 7.3612159322), (80.75, 11.4112159322), (76.7, 7.3612159322))
        make_face()
        with BuildLine():
            ThreePointArc((4.45, 0), (4.25, 0.2), (4.05, 0))
            ThreePointArc((4.05, 0), (4.25, -0.2), (4.45, 0))
        make_face()
        with BuildLine():
            ThreePointArc((12.95, 0), (12.75, 0.2), (12.55, 0))
            ThreePointArc((12.55, 0), (12.75, -0.2), (12.95, 0))
        make_face()
        with BuildLine():
            ThreePointArc((8.7, 7.3612159322), (8.5, 7.5612159322), (8.3, 7.3612159322))
            ThreePointArc((8.3, 7.3612159322), (8.5, 7.1612159322), (8.7, 7.3612159322))
        make_face()
        with BuildLine():
            ThreePointArc((21.45, 0), (21.25, 0.2), (21.05, 0))
            ThreePointArc((21.05, 0), (21.25, -0.2), (21.45, 0))
        make_face()
        with BuildLine():
            ThreePointArc((17.2, 7.3612159322), (17, 7.5612159322), (16.8, 7.3612159322))
            ThreePointArc((16.8, 7.3612159322), (17, 7.1612159322), (17.2, 7.3612159322))
        make_face()
        with BuildLine():
            ThreePointArc((29.95, 0), (29.75, 0.2), (29.55, 0))
            ThreePointArc((29.55, 0), (29.75, -0.2), (29.95, 0))
        make_face()
        with BuildLine():
            ThreePointArc((25.7, 7.3612159322), (25.5, 7.5612159322), (25.3, 7.3612159322))
            ThreePointArc((25.3, 7.3612159322), (25.5, 7.1612159322), (25.7, 7.3612159322))
        make_face()
        with BuildLine():
            ThreePointArc((38.45, 0), (38.25, 0.2), (38.05, 0))
            ThreePointArc((38.05, 0), (38.25, -0.2), (38.45, 0))
        make_face()
        with BuildLine():
            ThreePointArc((34.2, 7.3612159322), (34, 7.5612159322), (33.8, 7.3612159322))
            ThreePointArc((33.8, 7.3612159322), (34, 7.1612159322), (34.2, 7.3612159322))
        make_face()
        with BuildLine():
            ThreePointArc((46.95, 0), (46.75, 0.2), (46.55, 0))
            ThreePointArc((46.55, 0), (46.75, -0.2), (46.95, 0))
        make_face()
        with BuildLine():
            ThreePointArc((42.7, 7.3612159322), (42.5, 7.5612159322), (42.3, 7.3612159322))
            ThreePointArc((42.3, 7.3612159322), (42.5, 7.1612159322), (42.7, 7.3612159322))
        make_face()
        with BuildLine():
            ThreePointArc((55.45, 0), (55.25, 0.2), (55.05, 0))
            ThreePointArc((55.05, 0), (55.25, -0.2), (55.45, 0))
        make_face()
        with BuildLine():
            ThreePointArc((51.2, 7.3612159322), (51, 7.5612159322), (50.8, 7.3612159322))
            ThreePointArc((50.8, 7.3612159322), (51, 7.1612159322), (51.2, 7.3612159322))
        make_face()
        with BuildLine():
            ThreePointArc((63.95, 0), (63.75, 0.2), (63.55, 0))
            ThreePointArc((63.55, 0), (63.75, -0.2), (63.95, 0))
        make_face()
        with BuildLine():
            ThreePointArc((59.7, 7.3612159322), (59.5, 7.5612159322), (59.3, 7.3612159322))
            ThreePointArc((59.3, 7.3612159322), (59.5, 7.1612159322), (59.7, 7.3612159322))
        make_face()
        with BuildLine():
            ThreePointArc((72.45, 0), (72.25, 0.2), (72.05, 0))
            ThreePointArc((72.05, 0), (72.25, -0.2), (72.45, 0))
        make_face()
        with BuildLine():
            ThreePointArc((68.2, 7.3612159322), (68, 7.5612159322), (67.8, 7.3612159322))
            ThreePointArc((67.8, 7.3612159322), (68, 7.1612159322), (68.2, 7.3612159322))
        make_face()
        with BuildLine():
            ThreePointArc((76.7, 7.3612159322), (76.5, 7.5612159322), (76.3, 7.3612159322))
            ThreePointArc((76.3, 7.3612159322), (76.5, 7.1612159322), (76.7, 7.3612159322))
        make_face()
    extrude(amount=-F3_DEPTH)

    # F4
    f4_edges = [f1.edges().sort_by_distance(p)[0] for p in [
        (38.25, -5.65, 75),
        (85.643044, 10.186216, 75),
        (83.518044, 0.855608, 75),
        (79.325, -4.893044, 75),
        (-4.893044, -2.825, 75),
        (-2.768044, 6.505608, 75),
        (1.425, 12.254259, 75),
        (42.5, 13.011216, 75),
    ]]
    fillet(f4_edges, radius=F4_R)


solid = f1.part
